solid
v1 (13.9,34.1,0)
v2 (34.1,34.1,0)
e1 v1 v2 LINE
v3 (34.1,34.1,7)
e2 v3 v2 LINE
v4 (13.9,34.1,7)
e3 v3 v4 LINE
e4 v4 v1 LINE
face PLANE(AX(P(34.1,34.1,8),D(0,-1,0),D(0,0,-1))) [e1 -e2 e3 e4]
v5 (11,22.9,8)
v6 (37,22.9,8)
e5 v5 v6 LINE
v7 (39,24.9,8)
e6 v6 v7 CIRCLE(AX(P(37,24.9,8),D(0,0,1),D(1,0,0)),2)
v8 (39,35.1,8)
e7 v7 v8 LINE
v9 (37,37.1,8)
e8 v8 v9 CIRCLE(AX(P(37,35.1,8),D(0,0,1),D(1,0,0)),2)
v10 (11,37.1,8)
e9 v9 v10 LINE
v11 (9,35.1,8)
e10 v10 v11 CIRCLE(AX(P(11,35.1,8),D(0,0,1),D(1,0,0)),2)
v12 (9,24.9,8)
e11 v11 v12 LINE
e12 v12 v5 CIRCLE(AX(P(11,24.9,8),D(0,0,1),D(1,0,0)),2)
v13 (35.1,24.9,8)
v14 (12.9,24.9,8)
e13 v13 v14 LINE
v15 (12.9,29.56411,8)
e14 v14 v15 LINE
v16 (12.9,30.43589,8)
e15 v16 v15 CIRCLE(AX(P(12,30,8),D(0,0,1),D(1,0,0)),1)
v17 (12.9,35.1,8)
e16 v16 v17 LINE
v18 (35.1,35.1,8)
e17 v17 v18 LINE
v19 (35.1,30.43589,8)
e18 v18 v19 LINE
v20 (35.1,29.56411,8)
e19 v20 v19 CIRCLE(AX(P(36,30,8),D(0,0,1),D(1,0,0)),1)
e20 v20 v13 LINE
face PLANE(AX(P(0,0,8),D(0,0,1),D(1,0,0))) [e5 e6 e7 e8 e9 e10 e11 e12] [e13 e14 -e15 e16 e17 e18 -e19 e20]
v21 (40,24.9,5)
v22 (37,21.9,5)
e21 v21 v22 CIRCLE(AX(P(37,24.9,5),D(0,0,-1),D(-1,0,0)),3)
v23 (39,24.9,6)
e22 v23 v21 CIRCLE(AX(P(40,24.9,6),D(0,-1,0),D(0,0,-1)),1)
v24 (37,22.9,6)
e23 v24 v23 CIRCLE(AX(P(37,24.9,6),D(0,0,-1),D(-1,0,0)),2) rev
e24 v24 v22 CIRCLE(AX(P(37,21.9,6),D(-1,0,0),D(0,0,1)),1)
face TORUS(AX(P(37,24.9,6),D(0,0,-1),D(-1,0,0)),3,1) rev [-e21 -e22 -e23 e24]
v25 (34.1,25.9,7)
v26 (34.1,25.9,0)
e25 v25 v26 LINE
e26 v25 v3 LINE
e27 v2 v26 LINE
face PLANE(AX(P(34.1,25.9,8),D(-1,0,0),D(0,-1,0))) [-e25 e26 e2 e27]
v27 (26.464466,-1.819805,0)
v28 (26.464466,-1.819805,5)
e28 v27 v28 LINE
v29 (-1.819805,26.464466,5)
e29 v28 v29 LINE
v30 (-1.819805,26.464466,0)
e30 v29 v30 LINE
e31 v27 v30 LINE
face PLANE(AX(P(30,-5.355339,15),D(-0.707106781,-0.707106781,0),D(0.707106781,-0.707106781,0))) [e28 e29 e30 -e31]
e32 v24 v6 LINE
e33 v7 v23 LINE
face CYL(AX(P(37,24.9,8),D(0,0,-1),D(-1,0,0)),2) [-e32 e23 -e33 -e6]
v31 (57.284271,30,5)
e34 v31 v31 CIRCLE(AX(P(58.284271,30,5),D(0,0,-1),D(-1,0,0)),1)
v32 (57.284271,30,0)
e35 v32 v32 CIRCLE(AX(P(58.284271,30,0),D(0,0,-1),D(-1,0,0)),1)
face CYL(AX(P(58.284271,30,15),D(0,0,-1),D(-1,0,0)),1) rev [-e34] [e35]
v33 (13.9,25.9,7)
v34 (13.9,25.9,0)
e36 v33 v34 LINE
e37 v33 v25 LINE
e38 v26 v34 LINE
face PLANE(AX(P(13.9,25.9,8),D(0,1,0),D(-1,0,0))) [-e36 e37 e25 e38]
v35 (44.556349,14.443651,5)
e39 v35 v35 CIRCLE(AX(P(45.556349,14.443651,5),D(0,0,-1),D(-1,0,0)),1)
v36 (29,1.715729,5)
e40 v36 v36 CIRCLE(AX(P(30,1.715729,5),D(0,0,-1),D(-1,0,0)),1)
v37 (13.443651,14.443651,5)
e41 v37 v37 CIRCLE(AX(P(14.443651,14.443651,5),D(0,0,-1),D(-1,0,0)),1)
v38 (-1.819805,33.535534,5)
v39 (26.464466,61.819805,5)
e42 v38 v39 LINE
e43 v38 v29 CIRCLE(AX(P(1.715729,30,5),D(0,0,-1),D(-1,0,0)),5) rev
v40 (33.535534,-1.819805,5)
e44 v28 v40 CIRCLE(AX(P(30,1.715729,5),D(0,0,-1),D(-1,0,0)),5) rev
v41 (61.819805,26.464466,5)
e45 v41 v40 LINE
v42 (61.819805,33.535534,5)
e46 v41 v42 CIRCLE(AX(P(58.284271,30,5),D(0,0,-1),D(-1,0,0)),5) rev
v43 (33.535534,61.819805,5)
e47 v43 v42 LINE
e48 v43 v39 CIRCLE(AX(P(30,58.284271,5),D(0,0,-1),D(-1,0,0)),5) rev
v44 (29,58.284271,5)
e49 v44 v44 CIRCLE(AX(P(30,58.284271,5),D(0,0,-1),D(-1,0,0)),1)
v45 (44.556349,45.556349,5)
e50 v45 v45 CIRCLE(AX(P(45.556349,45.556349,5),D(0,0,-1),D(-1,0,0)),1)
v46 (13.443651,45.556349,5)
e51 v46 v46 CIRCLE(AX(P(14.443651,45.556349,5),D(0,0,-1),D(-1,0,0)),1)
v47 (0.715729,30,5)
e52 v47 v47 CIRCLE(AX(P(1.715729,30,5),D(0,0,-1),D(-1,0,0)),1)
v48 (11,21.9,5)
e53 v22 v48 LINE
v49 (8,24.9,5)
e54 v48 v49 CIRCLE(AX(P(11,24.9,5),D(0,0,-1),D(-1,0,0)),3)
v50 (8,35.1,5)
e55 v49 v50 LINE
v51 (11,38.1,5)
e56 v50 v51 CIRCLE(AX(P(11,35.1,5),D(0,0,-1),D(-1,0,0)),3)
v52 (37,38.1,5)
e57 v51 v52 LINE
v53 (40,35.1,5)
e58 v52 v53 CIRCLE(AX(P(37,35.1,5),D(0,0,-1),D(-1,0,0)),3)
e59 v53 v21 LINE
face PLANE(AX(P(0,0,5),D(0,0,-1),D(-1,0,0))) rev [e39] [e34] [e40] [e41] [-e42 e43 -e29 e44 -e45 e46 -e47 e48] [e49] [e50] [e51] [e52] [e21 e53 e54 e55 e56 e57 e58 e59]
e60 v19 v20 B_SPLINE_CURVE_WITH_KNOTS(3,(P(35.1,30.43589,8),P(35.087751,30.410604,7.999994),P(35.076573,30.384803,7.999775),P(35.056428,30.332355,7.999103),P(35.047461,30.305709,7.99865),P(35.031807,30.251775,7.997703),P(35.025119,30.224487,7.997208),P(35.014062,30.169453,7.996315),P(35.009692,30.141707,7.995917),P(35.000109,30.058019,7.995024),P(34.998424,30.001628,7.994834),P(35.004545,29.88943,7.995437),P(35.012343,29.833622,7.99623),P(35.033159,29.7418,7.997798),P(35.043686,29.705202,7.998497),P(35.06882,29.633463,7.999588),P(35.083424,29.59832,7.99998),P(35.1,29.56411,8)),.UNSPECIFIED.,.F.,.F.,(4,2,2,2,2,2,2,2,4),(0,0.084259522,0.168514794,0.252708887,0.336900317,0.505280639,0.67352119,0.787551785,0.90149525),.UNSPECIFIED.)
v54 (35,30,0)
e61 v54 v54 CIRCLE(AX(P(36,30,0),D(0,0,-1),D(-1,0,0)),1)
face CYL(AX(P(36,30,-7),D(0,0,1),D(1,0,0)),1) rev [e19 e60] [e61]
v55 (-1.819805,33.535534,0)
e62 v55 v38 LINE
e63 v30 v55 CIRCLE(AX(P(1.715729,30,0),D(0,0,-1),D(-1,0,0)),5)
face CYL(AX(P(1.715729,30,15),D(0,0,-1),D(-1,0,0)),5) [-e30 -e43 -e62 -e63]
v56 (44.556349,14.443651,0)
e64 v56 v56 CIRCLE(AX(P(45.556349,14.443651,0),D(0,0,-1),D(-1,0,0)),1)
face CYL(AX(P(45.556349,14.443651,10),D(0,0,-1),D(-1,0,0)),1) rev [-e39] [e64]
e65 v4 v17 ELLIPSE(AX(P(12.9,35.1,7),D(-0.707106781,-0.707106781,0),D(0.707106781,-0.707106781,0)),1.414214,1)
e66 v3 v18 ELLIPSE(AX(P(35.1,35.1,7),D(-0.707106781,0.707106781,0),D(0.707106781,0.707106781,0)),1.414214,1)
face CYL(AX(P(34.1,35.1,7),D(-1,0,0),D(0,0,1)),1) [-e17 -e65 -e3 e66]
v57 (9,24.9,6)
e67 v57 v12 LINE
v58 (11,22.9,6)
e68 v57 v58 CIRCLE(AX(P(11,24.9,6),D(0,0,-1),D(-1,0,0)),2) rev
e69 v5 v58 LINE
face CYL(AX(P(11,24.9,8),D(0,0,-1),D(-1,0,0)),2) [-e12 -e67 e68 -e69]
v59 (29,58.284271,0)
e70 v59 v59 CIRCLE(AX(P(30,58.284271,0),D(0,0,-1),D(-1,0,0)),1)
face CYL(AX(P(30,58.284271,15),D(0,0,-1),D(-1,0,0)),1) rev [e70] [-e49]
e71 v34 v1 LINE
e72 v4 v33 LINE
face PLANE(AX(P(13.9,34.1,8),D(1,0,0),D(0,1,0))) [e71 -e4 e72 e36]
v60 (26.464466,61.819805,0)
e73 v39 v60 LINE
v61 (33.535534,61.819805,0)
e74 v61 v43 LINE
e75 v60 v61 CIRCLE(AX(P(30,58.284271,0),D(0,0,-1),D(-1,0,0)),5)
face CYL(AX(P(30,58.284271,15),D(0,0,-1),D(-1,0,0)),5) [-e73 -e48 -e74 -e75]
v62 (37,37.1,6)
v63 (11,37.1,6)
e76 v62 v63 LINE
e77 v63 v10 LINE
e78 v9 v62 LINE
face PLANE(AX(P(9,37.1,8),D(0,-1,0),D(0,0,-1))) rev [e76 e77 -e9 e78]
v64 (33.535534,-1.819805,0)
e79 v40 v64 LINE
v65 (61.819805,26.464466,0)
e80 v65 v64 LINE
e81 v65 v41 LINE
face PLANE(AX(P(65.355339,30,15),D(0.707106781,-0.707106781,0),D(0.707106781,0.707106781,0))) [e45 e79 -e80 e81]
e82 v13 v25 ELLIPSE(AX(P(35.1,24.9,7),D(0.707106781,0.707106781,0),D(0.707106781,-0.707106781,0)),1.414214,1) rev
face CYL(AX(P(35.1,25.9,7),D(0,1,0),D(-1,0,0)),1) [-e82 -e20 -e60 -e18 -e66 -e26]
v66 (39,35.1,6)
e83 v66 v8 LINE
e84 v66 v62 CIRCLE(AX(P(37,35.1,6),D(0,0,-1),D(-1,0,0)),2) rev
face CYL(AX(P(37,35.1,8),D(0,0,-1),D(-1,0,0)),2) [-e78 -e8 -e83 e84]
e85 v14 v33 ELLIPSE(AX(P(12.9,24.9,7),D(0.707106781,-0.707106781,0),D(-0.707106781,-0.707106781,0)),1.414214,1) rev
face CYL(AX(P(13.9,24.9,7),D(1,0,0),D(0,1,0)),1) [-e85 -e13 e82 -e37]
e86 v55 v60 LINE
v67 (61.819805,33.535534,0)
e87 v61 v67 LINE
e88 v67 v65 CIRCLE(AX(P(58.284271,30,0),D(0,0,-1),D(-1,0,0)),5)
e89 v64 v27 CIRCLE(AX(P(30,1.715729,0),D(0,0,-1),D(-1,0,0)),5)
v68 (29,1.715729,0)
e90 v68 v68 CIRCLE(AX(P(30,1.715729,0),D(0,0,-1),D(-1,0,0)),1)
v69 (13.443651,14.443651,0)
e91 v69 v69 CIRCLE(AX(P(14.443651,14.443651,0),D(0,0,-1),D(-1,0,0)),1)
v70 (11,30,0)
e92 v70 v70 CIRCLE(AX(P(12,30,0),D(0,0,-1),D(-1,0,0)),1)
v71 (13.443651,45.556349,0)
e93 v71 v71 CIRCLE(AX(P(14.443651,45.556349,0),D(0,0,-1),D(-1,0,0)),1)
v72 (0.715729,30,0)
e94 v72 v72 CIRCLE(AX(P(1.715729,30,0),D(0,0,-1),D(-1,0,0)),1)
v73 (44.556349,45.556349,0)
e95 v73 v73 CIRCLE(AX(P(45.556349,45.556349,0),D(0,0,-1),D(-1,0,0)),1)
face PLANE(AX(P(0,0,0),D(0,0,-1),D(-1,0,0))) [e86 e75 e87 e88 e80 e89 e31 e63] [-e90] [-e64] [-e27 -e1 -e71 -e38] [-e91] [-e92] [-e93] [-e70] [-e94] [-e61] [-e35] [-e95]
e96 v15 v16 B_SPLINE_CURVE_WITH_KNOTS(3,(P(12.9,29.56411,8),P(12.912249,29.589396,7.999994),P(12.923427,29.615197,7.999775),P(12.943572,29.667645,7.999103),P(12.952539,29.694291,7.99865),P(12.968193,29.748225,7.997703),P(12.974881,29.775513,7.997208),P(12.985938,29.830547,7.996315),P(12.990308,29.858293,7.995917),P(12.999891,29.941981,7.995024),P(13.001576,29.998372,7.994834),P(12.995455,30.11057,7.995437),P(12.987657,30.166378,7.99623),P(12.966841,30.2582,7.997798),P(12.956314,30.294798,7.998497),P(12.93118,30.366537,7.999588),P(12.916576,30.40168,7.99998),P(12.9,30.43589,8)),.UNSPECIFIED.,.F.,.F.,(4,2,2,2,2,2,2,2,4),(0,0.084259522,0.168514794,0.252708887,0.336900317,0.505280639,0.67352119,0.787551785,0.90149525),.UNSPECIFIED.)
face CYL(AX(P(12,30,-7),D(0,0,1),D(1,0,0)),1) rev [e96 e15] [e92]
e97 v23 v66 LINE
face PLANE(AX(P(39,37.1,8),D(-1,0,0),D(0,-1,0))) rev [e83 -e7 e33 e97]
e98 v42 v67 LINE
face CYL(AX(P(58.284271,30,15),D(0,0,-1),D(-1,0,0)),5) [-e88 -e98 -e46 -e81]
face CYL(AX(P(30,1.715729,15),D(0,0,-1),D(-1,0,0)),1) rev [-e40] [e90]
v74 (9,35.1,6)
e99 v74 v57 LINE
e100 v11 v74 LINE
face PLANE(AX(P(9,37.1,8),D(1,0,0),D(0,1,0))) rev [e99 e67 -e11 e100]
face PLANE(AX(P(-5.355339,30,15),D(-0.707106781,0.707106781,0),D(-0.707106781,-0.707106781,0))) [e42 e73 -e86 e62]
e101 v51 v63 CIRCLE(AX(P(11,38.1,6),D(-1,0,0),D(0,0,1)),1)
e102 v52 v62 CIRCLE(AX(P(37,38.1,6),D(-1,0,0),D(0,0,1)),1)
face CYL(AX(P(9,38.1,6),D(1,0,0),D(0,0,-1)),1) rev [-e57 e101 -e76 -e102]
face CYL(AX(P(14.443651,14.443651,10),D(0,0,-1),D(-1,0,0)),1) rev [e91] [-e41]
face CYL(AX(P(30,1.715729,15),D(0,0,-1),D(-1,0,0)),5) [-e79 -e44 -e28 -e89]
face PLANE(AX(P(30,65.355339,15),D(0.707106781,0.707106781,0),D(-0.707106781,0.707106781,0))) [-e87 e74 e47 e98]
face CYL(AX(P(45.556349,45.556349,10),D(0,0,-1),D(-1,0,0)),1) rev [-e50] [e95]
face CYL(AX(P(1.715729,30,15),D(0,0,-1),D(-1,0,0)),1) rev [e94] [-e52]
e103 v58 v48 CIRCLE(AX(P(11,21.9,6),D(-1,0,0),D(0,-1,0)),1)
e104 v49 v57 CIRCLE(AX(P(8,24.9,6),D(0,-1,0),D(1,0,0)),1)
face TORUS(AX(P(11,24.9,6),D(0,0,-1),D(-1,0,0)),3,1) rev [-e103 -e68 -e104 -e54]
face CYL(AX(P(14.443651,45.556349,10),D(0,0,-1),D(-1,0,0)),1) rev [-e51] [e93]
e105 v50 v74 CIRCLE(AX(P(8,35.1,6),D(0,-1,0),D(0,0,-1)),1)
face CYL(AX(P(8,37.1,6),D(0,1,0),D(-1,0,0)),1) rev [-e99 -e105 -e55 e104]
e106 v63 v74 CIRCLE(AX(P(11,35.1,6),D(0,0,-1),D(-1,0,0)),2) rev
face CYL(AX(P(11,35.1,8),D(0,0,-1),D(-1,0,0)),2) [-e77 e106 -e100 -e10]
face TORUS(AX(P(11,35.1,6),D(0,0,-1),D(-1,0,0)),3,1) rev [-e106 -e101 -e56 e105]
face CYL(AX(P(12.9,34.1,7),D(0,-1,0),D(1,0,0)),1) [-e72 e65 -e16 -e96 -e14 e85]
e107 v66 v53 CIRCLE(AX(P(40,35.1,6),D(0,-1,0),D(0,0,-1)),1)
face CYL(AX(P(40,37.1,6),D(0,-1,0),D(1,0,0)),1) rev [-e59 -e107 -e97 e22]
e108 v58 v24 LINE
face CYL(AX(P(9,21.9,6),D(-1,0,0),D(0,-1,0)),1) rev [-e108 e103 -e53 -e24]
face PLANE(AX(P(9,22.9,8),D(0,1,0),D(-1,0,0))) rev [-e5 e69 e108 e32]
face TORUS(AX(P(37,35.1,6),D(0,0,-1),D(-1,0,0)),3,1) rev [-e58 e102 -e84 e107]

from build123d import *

# Parameters (mm, degrees)
SKETCH1_W           = 60
SKETCH1_H           = 60
BOSS_EXTRUDE1_DEPTH = 5
SKETCH2_W           = 30
SKETCH2_H           = 14.2
SKETCH2_W_2         = 20.2
SKETCH2_H_2         = 8.2
BOSS_EXTRUDE2_DEPTH = 3
SKETCH3_W           = 20.2
SKETCH3_H           = 8.2
CUT_EXTRUDE1_DEPTH  = 15
SKETCH5_R           = 1
CUT_EXTRUDE2_DEPTH  = 15
FILLET1_R           = 2
SKETCH6_W           = 120.017280655
SKETCH6_H           = 101.423054075
CUT_EXTRUDE3_DEPTH  = 15
BOSS_EXTRUDE3_DEPTH = 5
CUT_EXTRUDE4_DEPTH  = 15
FILLET3_R           = 5
SKETCH9_R           = 1
CUT_EXTRUDE5_DEPTH  = 15
SKETCH10_R          = 1
CUT_EXTRUDE6_DEPTH  = 10
FILLET4_R           = 1


with BuildPart() as part:
    # Sketch1 → Boss-Extrude1 (new body)
    with BuildSketch(Plane.XY):
        with Locations((30, 30)):
            Rectangle(SKETCH1_W, SKETCH1_H)
    extrude(amount=BOSS_EXTRUDE1_DEPTH)

    # Sketch2 → Boss-Extrude2 (add)
    with BuildSketch(Plane.XY.offset(5)):
        with Locations((24, 30)):
            Rectangle(SKETCH2_W, SKETCH2_H)
        with Locations((24, 30)):
            Rectangle(SKETCH2_W_2, SKETCH2_H_2, mode=Mode.SUBTRACT)
    extrude(amount=BOSS_EXTRUDE2_DEPTH)

    # Sketch3 → Cut-Extrude1 (cut)
    with BuildSketch(Plane.XY.offset(5)):
        with Locations((24, 30)):
            Rectangle(SKETCH3_W, SKETCH3_H)
    extrude(amount=-CUT_EXTRUDE1_DEPTH, mode=Mode.SUBTRACT)

    # Sketch5 → Cut-Extrude2 (cut)
    with BuildSketch(Plane.XY.offset(8)):
        with Locations((12, 30)):
            Circle(SKETCH5_R)
        with Locations((36, 30)):
            Circle(SKETCH5_R)
    extrude(amount=-CUT_EXTRUDE2_DEPTH, mode=Mode.SUBTRACT)

    # Fillet1
    fillet1_edges = [part.edges().sort_by_distance(p)[0] for p in [
        (39, 22.9, 6.5),
        (39, 37.1, 6.5),
        (9, 37.1, 6.5),
        (9, 22.9, 6.5),
        (0, 0, 2.5),
        (0, 60, 2.5),
        (60, 60, 2.5),
        (60, 0, 2.5),
    ]]
    fillet(fillet1_edges, radius=FILLET1_R)

    # Sketch6 → Cut-Extrude3 (cut)
    with BuildSketch(Plane(origin=(0, 0, 0), x_dir=(-1, 0, 0), z_dir=(0, 0, -1))):
        with Locations((-31.690384235, 31.655167897)):
            Rectangle(SKETCH6_W, SKETCH6_H)
        Polygon((-8.786796564, 51.213203436), (12.426406871, 30), (-30, -12.426406871), (-72.426406871, 30), (-30, 72.426406871), align=None, mode=Mode.SUBTRACT)
    extrude(amount=-CUT_EXTRUDE3_DEPTH, mode=Mode.SUBTRACT)

    # Sketch7 → Boss-Extrude3 (add)
    with BuildSketch(Plane(origin=(0, 0, 0), x_dir=(-1, 0, 0), z_dir=(0, 0, -1))):
        Polygon((-8.786796564, 51.213203436), (12.426406871, 30), (-30, -12.426406871), (-72.426406871, 30), (-30, 72.426406871), align=None)
        Polygon((-19.393398282, 40.606601718), (-8.786796564, 30), (-30, 8.786796564), (-51.213203436, 30), (-30, 51.213203436), align=None, mode=Mode.SUBTRACT)
    extrude(amount=-BOSS_EXTRUDE3_DEPTH)

    # Sketch8 → Cut-Extrude4 (cut)
    with BuildSketch(Plane(origin=(0, 0, 0), x_dir=(-1, 0, 0), z_dir=(0, 0, -1))):
        Polygon((-30, -12.426406871), (12.426406871, 30), (-30, 72.426406871), (-72.426406871, 30), align=None)
        Polygon((-30, -5.355339059), (5.355339059, 30), (-30, 65.355339059), (-65.355339059, 30), align=None, mode=Mode.SUBTRACT)
    extrude(amount=-CUT_EXTRUDE4_DEPTH, mode=Mode.SUBTRACT)

    # Fillet3
    fillet3_edges = [part.edges().sort_by_distance(p)[0] for p in [
        (65.355339059, 30, 2.5),
        (30, 65.355339059, 2.5),
        (-5.355339059, 30, 2.5),
        (30, -5.355339059, 2.5),
    ]]
    fillet(fillet3_edges, radius=FILLET3_R)

    # Sketch9 → Cut-Extrude5 (cut)
    with BuildSketch(Plane(origin=(0, 0, 0), x_dir=(-1, 0, 0), z_dir=(0, 0, -1))):
        with Locations((-30, 58.284271247)):
            Circle(SKETCH9_R)
        with Locations((-30, 1.715728753)):
            Circle(SKETCH9_R)
        with Locations((-1.715728753, 30)):
            Circle(SKETCH9_R)
        with Locations((-58.284271247, 30)):
            Circle(SKETCH9_R)
    extrude(amount=-CUT_EXTRUDE5_DEPTH, mode=Mode.SUBTRACT)

    # Sketch10 → Cut-Extrude6 (cut)
    with BuildSketch(Plane(origin=(0, 0, 0), x_dir=(-1, 0, 0), z_dir=(0, 0, -1))):
        with Locations((-45.556349186, 45.556349186)):
            Circle(SKETCH10_R)
        with Locations((-45.556349186, 14.443650814)):
            Circle(SKETCH10_R)
        with Locations((-14.443650814, 14.443650814)):
            Circle(SKETCH10_R)
        with Locations((-14.443650814, 45.556349186)):
            Circle(SKETCH10_R)
    extrude(amount=-CUT_EXTRUDE6_DEPTH, mode=Mode.SUBTRACT)

    # Fillet4
    # the kernel refuses this fillet: 1 mm, written as the material it adds along each edge
    with BuildSketch(Plane(origin=(37, 35.1, 5), x_dir=(0, 1, 0), z_dir=(-1, 0, 0))) as fillet4_piece_1:
        with BuildLine():
            CenterArc((2 + FILLET4_R, -FILLET4_R), FILLET4_R, 90, 90)
            Line((2, -FILLET4_R), (2, 0))
            Line((2, 0), (2 + FILLET4_R, 0))
        make_face()
    revolve(axis=Axis((37, 35.1, 5), (0, 0, -1)), revolution_arc=90)
    with BuildSketch(Plane(origin=(37, 22.9, 5), x_dir=(0, -1, 0), z_dir=(-1, 0, 0)), Plane(origin=(11, 37.1, 5), x_dir=(0, 1, 0), z_dir=(1, 0, 0))) as fillet4_piece_2:
        with BuildLine():
            CenterArc((FILLET4_R, FILLET4_R), FILLET4_R, 180, 90)
            Line((0, FILLET4_R), (0, 0))
            Line((0, 0), (FILLET4_R, 0))
        make_face()
    extrude(amount=26)
    with BuildSketch(Plane(origin=(9, 24.9, 5), x_dir=(-1, 0, 0), z_dir=(0, 1, 0)), Plane(origin=(39, 35.1, 5), x_dir=(1, 0, 0), z_dir=(0, -1, 0))) as fillet4_piece_3:
        with BuildLine():
            CenterArc((FILLET4_R, FILLET4_R), FILLET4_R, 180, 90)
            Line((0, FILLET4_R), (0, 0))
            Line((0, 0), (FILLET4_R, 0))
        make_face()
    extrude(amount=10.2)
    with BuildSketch(Plane(origin=(11, 24.9, 5), x_dir=(0, -1, 0), z_dir=(1, 0, 0))) as fillet4_piece_4:
        with BuildLine():
            CenterArc((2 + FILLET4_R, -FILLET4_R), FILLET4_R, 90, 90)
            Line((2, -FILLET4_R), (2, 0))
            Line((2, 0), (2 + FILLET4_R, 0))
        make_face()
    revolve(axis=Axis((11, 24.9, 5), (0, 0, -1)), revolution_arc=90)
    with BuildSketch(Plane(origin=(11, 35.1, 5), x_dir=(0, 1, 0), z_dir=(1, 0, 0))) as fillet4_piece_5:
        with BuildLine():
            CenterArc((2 + FILLET4_R, FILLET4_R), FILLET4_R, 180, 90)
            Line((2, FILLET4_R), (2, 0))
            Line((2, 0), (2 + FILLET4_R, 0))
        make_face()
    revolve(axis=Axis((11, 35.1, 5), (0, 0, 1)), revolution_arc=90)
    with BuildSketch(Plane(origin=(37, 24.9, 5), x_dir=(1, 0, 0), z_dir=(0, 1, 0))) as fillet4_piece_6:
        with BuildLine():
            CenterArc((2 + FILLET4_R, -FILLET4_R), FILLET4_R, 90, 90)
            Line((2, -FILLET4_R), (2, 0))
            Line((2, 0), (2 + FILLET4_R, 0))
        make_face()
    revolve(axis=Axis((37, 24.9, 5), (0, 0, -1)), revolution_arc=90)
    # the kernel refuses this fillet: 1 mm, written as the material it takes off along each edge
    with BuildSketch(Plane(origin=(34.1, 25.9, 8), x_dir=(0, 0, -1), z_dir=(0, 1, 0)), Plane(origin=(13.9, 34.1, 8), x_dir=(0, 0, -1), z_dir=(0, -1, 0))) as fillet4_2_piece_1:
        with BuildLine():
            CenterArc((FILLET4_R, -FILLET4_R), FILLET4_R, 90, 90)
            Line((0, -FILLET4_R), (0, 0))
            Line((0, 0), (FILLET4_R, 0))
        make_face()
    extrude(amount=8.2, mode=Mode.SUBTRACT)
    with BuildSketch(Plane(origin=(34.1, 34.1, 8), x_dir=(0, 0, -1), z_dir=(-1, 0, 0)), Plane(origin=(13.9, 25.9, 8), x_dir=(0, 0, -1), z_dir=(1, 0, 0))) as fillet4_2_piece_2:
        with BuildLine():
            CenterArc((FILLET4_R, -FILLET4_R), FILLET4_R, 90, 90)
            Line((0, -FILLET4_R), (0, 0))
            Line((0, 0), (FILLET4_R, 0))
        make_face()
    extrude(amount=20.2, mode=Mode.SUBTRACT)
    with BuildSketch(Plane(origin=(13.9, 25.9, 8), x_dir=(0, 0, -1), z_dir=(1, 0, 0))) as fillet4_2_piece_3a_section:
        with BuildLine():
            CenterArc((FILLET4_R, -FILLET4_R), FILLET4_R, 90, 90)
            Line((0, -FILLET4_R), (0, 0))
            Line((0, 0), (FILLET4_R, 0))
        make_face()
    fillet4_2_piece_3a = extrude(amount=22.7, mode=Mode.PRIVATE)
    fillet4_2_piece_3a = split(fillet4_2_piece_3a, bisect_by=Plane(origin=(34.1, 25.673604886, 7.773604886), z_dir=(1, 0, 0)), keep=Keep.TOP, mode=Mode.PRIVATE)
    with BuildSketch(Plane(origin=(34.1, 23.4, 8), x_dir=(0, 0, -1), z_dir=(0, 1, 0))) as fillet4_2_piece_3b_section:
        with BuildLine():
            CenterArc((FILLET4_R, -FILLET4_R), FILLET4_R, 90, 90)
            Line((0, -FILLET4_R), (0, 0))
            Line((0, 0), (FILLET4_R, 0))
        make_face()
    fillet4_2_piece_3b = extrude(amount=10.7, mode=Mode.PRIVATE)
    fillet4_2_piece_3b = split(fillet4_2_piece_3b, bisect_by=Plane(origin=(34.326395114, 25.9, 7.773604886), z_dir=(0, -1, 0)), keep=Keep.TOP, mode=Mode.PRIVATE)
    fillet4_2_piece_3 = fillet4_2_piece_3a & fillet4_2_piece_3b
    add(fillet4_2_piece_3, mode=Mode.SUBTRACT)
    with BuildSketch(Plane(origin=(34.1, 25.9, 8), x_dir=(0, 0, -1), z_dir=(0, 1, 0))) as fillet4_2_piece_4a_section:
        with BuildLine():
            CenterArc((FILLET4_R, -FILLET4_R), FILLET4_R, 90, 90)
            Line((0, -FILLET4_R), (0, 0))
            Line((0, 0), (FILLET4_R, 0))
        make_face()
    fillet4_2_piece_4a = extrude(amount=10.7, mode=Mode.PRIVATE)
    fillet4_2_piece_4a = split(fillet4_2_piece_4a, bisect_by=Plane(origin=(34.326395114, 34.1, 7.773604886), z_dir=(0, 1, 0)), keep=Keep.TOP, mode=Mode.PRIVATE)
    with BuildSketch(Plane(origin=(36.6, 34.1, 8), x_dir=(0, 0, -1), z_dir=(-1, 0, 0))) as fillet4_2_piece_4b_section:
        with BuildLine():
            CenterArc((FILLET4_R, -FILLET4_R), FILLET4_R, 90, 90)
            Line((0, -FILLET4_R), (0, 0))
            Line((0, 0), (FILLET4_R, 0))
        make_face()
    fillet4_2_piece_4b = extrude(amount=22.7, mode=Mode.PRIVATE)
    fillet4_2_piece_4b = split(fillet4_2_piece_4b, bisect_by=Plane(origin=(34.1, 34.326395114, 7.773604886), z_dir=(1, 0, 0)), keep=Keep.TOP, mode=Mode.PRIVATE)
    fillet4_2_piece_4 = fillet4_2_piece_4a & fillet4_2_piece_4b
    add(fillet4_2_piece_4, mode=Mode.SUBTRACT)
    with BuildSketch(Plane(origin=(13.9, 36.6, 8), x_dir=(0, 0, -1), z_dir=(0, -1, 0))) as fillet4_2_piece_5a_section:
        with BuildLine():
            CenterArc((FILLET4_R, -FILLET4_R), FILLET4_R, 90, 90)
            Line((0, -FILLET4_R), (0, 0))
            Line((0, 0), (FILLET4_R, 0))
        make_face()
    fillet4_2_piece_5a = extrude(amount=10.7, mode=Mode.PRIVATE)
    fillet4_2_piece_5a = split(fillet4_2_piece_5a, bisect_by=Plane(origin=(13.673604886, 34.1, 7.773604886), z_dir=(0, 1, 0)), keep=Keep.TOP, mode=Mode.PRIVATE)
    with BuildSketch(Plane(origin=(34.1, 34.1, 8), x_dir=(0, 0, -1), z_dir=(-1, 0, 0))) as fillet4_2_piece_5b_section:
        with BuildLine():
            CenterArc((FILLET4_R, -FILLET4_R), FILLET4_R, 90, 90)
            Line((0, -FILLET4_R), (0, 0))
            Line((0, 0), (FILLET4_R, 0))
        make_face()
    fillet4_2_piece_5b = extrude(amount=22.7, mode=Mode.PRIVATE)
    fillet4_2_piece_5b = split(fillet4_2_piece_5b, bisect_by=Plane(origin=(13.9, 34.326395114, 7.773604886), z_dir=(-1, 0, 0)), keep=Keep.TOP, mode=Mode.PRIVATE)
    fillet4_2_piece_5 = fillet4_2_piece_5a & fillet4_2_piece_5b
    add(fillet4_2_piece_5, mode=Mode.SUBTRACT)
    with BuildSketch(Plane(origin=(11.4, 25.9, 8), x_dir=(0, 0, -1), z_dir=(1, 0, 0))) as fillet4_2_piece_6a_section:
        with BuildLine():
            CenterArc((FILLET4_R, -FILLET4_R), FILLET4_R, 90, 90)
            Line((0, -FILLET4_R), (0, 0))
            Line((0, 0), (FILLET4_R, 0))
        make_face()
    fillet4_2_piece_6a = extrude(amount=22.7, mode=Mode.PRIVATE)
    fillet4_2_piece_6a = split(fillet4_2_piece_6a, bisect_by=Plane(origin=(13.9, 25.673604886, 7.773604886), z_dir=(-1, 0, 0)), keep=Keep.TOP, mode=Mode.PRIVATE)
    with BuildSketch(Plane(origin=(13.9, 34.1, 8), x_dir=(0, 0, -1), z_dir=(0, -1, 0))) as fillet4_2_piece_6b_section:
        with BuildLine():
            CenterArc((FILLET4_R, -FILLET4_R), FILLET4_R, 90, 90)
            Line((0, -FILLET4_R), (0, 0))
            Line((0, 0), (FILLET4_R, 0))
        make_face()
    fillet4_2_piece_6b = extrude(amount=10.7, mode=Mode.PRIVATE)
    fillet4_2_piece_6b = split(fillet4_2_piece_6b, bisect_by=Plane(origin=(13.673604886, 25.9, 7.773604886), z_dir=(0, -1, 0)), keep=Keep.TOP, mode=Mode.PRIVATE)
    fillet4_2_piece_6 = fillet4_2_piece_6a & fillet4_2_piece_6b
    add(fillet4_2_piece_6, mode=Mode.SUBTRACT)


solid = part.part
